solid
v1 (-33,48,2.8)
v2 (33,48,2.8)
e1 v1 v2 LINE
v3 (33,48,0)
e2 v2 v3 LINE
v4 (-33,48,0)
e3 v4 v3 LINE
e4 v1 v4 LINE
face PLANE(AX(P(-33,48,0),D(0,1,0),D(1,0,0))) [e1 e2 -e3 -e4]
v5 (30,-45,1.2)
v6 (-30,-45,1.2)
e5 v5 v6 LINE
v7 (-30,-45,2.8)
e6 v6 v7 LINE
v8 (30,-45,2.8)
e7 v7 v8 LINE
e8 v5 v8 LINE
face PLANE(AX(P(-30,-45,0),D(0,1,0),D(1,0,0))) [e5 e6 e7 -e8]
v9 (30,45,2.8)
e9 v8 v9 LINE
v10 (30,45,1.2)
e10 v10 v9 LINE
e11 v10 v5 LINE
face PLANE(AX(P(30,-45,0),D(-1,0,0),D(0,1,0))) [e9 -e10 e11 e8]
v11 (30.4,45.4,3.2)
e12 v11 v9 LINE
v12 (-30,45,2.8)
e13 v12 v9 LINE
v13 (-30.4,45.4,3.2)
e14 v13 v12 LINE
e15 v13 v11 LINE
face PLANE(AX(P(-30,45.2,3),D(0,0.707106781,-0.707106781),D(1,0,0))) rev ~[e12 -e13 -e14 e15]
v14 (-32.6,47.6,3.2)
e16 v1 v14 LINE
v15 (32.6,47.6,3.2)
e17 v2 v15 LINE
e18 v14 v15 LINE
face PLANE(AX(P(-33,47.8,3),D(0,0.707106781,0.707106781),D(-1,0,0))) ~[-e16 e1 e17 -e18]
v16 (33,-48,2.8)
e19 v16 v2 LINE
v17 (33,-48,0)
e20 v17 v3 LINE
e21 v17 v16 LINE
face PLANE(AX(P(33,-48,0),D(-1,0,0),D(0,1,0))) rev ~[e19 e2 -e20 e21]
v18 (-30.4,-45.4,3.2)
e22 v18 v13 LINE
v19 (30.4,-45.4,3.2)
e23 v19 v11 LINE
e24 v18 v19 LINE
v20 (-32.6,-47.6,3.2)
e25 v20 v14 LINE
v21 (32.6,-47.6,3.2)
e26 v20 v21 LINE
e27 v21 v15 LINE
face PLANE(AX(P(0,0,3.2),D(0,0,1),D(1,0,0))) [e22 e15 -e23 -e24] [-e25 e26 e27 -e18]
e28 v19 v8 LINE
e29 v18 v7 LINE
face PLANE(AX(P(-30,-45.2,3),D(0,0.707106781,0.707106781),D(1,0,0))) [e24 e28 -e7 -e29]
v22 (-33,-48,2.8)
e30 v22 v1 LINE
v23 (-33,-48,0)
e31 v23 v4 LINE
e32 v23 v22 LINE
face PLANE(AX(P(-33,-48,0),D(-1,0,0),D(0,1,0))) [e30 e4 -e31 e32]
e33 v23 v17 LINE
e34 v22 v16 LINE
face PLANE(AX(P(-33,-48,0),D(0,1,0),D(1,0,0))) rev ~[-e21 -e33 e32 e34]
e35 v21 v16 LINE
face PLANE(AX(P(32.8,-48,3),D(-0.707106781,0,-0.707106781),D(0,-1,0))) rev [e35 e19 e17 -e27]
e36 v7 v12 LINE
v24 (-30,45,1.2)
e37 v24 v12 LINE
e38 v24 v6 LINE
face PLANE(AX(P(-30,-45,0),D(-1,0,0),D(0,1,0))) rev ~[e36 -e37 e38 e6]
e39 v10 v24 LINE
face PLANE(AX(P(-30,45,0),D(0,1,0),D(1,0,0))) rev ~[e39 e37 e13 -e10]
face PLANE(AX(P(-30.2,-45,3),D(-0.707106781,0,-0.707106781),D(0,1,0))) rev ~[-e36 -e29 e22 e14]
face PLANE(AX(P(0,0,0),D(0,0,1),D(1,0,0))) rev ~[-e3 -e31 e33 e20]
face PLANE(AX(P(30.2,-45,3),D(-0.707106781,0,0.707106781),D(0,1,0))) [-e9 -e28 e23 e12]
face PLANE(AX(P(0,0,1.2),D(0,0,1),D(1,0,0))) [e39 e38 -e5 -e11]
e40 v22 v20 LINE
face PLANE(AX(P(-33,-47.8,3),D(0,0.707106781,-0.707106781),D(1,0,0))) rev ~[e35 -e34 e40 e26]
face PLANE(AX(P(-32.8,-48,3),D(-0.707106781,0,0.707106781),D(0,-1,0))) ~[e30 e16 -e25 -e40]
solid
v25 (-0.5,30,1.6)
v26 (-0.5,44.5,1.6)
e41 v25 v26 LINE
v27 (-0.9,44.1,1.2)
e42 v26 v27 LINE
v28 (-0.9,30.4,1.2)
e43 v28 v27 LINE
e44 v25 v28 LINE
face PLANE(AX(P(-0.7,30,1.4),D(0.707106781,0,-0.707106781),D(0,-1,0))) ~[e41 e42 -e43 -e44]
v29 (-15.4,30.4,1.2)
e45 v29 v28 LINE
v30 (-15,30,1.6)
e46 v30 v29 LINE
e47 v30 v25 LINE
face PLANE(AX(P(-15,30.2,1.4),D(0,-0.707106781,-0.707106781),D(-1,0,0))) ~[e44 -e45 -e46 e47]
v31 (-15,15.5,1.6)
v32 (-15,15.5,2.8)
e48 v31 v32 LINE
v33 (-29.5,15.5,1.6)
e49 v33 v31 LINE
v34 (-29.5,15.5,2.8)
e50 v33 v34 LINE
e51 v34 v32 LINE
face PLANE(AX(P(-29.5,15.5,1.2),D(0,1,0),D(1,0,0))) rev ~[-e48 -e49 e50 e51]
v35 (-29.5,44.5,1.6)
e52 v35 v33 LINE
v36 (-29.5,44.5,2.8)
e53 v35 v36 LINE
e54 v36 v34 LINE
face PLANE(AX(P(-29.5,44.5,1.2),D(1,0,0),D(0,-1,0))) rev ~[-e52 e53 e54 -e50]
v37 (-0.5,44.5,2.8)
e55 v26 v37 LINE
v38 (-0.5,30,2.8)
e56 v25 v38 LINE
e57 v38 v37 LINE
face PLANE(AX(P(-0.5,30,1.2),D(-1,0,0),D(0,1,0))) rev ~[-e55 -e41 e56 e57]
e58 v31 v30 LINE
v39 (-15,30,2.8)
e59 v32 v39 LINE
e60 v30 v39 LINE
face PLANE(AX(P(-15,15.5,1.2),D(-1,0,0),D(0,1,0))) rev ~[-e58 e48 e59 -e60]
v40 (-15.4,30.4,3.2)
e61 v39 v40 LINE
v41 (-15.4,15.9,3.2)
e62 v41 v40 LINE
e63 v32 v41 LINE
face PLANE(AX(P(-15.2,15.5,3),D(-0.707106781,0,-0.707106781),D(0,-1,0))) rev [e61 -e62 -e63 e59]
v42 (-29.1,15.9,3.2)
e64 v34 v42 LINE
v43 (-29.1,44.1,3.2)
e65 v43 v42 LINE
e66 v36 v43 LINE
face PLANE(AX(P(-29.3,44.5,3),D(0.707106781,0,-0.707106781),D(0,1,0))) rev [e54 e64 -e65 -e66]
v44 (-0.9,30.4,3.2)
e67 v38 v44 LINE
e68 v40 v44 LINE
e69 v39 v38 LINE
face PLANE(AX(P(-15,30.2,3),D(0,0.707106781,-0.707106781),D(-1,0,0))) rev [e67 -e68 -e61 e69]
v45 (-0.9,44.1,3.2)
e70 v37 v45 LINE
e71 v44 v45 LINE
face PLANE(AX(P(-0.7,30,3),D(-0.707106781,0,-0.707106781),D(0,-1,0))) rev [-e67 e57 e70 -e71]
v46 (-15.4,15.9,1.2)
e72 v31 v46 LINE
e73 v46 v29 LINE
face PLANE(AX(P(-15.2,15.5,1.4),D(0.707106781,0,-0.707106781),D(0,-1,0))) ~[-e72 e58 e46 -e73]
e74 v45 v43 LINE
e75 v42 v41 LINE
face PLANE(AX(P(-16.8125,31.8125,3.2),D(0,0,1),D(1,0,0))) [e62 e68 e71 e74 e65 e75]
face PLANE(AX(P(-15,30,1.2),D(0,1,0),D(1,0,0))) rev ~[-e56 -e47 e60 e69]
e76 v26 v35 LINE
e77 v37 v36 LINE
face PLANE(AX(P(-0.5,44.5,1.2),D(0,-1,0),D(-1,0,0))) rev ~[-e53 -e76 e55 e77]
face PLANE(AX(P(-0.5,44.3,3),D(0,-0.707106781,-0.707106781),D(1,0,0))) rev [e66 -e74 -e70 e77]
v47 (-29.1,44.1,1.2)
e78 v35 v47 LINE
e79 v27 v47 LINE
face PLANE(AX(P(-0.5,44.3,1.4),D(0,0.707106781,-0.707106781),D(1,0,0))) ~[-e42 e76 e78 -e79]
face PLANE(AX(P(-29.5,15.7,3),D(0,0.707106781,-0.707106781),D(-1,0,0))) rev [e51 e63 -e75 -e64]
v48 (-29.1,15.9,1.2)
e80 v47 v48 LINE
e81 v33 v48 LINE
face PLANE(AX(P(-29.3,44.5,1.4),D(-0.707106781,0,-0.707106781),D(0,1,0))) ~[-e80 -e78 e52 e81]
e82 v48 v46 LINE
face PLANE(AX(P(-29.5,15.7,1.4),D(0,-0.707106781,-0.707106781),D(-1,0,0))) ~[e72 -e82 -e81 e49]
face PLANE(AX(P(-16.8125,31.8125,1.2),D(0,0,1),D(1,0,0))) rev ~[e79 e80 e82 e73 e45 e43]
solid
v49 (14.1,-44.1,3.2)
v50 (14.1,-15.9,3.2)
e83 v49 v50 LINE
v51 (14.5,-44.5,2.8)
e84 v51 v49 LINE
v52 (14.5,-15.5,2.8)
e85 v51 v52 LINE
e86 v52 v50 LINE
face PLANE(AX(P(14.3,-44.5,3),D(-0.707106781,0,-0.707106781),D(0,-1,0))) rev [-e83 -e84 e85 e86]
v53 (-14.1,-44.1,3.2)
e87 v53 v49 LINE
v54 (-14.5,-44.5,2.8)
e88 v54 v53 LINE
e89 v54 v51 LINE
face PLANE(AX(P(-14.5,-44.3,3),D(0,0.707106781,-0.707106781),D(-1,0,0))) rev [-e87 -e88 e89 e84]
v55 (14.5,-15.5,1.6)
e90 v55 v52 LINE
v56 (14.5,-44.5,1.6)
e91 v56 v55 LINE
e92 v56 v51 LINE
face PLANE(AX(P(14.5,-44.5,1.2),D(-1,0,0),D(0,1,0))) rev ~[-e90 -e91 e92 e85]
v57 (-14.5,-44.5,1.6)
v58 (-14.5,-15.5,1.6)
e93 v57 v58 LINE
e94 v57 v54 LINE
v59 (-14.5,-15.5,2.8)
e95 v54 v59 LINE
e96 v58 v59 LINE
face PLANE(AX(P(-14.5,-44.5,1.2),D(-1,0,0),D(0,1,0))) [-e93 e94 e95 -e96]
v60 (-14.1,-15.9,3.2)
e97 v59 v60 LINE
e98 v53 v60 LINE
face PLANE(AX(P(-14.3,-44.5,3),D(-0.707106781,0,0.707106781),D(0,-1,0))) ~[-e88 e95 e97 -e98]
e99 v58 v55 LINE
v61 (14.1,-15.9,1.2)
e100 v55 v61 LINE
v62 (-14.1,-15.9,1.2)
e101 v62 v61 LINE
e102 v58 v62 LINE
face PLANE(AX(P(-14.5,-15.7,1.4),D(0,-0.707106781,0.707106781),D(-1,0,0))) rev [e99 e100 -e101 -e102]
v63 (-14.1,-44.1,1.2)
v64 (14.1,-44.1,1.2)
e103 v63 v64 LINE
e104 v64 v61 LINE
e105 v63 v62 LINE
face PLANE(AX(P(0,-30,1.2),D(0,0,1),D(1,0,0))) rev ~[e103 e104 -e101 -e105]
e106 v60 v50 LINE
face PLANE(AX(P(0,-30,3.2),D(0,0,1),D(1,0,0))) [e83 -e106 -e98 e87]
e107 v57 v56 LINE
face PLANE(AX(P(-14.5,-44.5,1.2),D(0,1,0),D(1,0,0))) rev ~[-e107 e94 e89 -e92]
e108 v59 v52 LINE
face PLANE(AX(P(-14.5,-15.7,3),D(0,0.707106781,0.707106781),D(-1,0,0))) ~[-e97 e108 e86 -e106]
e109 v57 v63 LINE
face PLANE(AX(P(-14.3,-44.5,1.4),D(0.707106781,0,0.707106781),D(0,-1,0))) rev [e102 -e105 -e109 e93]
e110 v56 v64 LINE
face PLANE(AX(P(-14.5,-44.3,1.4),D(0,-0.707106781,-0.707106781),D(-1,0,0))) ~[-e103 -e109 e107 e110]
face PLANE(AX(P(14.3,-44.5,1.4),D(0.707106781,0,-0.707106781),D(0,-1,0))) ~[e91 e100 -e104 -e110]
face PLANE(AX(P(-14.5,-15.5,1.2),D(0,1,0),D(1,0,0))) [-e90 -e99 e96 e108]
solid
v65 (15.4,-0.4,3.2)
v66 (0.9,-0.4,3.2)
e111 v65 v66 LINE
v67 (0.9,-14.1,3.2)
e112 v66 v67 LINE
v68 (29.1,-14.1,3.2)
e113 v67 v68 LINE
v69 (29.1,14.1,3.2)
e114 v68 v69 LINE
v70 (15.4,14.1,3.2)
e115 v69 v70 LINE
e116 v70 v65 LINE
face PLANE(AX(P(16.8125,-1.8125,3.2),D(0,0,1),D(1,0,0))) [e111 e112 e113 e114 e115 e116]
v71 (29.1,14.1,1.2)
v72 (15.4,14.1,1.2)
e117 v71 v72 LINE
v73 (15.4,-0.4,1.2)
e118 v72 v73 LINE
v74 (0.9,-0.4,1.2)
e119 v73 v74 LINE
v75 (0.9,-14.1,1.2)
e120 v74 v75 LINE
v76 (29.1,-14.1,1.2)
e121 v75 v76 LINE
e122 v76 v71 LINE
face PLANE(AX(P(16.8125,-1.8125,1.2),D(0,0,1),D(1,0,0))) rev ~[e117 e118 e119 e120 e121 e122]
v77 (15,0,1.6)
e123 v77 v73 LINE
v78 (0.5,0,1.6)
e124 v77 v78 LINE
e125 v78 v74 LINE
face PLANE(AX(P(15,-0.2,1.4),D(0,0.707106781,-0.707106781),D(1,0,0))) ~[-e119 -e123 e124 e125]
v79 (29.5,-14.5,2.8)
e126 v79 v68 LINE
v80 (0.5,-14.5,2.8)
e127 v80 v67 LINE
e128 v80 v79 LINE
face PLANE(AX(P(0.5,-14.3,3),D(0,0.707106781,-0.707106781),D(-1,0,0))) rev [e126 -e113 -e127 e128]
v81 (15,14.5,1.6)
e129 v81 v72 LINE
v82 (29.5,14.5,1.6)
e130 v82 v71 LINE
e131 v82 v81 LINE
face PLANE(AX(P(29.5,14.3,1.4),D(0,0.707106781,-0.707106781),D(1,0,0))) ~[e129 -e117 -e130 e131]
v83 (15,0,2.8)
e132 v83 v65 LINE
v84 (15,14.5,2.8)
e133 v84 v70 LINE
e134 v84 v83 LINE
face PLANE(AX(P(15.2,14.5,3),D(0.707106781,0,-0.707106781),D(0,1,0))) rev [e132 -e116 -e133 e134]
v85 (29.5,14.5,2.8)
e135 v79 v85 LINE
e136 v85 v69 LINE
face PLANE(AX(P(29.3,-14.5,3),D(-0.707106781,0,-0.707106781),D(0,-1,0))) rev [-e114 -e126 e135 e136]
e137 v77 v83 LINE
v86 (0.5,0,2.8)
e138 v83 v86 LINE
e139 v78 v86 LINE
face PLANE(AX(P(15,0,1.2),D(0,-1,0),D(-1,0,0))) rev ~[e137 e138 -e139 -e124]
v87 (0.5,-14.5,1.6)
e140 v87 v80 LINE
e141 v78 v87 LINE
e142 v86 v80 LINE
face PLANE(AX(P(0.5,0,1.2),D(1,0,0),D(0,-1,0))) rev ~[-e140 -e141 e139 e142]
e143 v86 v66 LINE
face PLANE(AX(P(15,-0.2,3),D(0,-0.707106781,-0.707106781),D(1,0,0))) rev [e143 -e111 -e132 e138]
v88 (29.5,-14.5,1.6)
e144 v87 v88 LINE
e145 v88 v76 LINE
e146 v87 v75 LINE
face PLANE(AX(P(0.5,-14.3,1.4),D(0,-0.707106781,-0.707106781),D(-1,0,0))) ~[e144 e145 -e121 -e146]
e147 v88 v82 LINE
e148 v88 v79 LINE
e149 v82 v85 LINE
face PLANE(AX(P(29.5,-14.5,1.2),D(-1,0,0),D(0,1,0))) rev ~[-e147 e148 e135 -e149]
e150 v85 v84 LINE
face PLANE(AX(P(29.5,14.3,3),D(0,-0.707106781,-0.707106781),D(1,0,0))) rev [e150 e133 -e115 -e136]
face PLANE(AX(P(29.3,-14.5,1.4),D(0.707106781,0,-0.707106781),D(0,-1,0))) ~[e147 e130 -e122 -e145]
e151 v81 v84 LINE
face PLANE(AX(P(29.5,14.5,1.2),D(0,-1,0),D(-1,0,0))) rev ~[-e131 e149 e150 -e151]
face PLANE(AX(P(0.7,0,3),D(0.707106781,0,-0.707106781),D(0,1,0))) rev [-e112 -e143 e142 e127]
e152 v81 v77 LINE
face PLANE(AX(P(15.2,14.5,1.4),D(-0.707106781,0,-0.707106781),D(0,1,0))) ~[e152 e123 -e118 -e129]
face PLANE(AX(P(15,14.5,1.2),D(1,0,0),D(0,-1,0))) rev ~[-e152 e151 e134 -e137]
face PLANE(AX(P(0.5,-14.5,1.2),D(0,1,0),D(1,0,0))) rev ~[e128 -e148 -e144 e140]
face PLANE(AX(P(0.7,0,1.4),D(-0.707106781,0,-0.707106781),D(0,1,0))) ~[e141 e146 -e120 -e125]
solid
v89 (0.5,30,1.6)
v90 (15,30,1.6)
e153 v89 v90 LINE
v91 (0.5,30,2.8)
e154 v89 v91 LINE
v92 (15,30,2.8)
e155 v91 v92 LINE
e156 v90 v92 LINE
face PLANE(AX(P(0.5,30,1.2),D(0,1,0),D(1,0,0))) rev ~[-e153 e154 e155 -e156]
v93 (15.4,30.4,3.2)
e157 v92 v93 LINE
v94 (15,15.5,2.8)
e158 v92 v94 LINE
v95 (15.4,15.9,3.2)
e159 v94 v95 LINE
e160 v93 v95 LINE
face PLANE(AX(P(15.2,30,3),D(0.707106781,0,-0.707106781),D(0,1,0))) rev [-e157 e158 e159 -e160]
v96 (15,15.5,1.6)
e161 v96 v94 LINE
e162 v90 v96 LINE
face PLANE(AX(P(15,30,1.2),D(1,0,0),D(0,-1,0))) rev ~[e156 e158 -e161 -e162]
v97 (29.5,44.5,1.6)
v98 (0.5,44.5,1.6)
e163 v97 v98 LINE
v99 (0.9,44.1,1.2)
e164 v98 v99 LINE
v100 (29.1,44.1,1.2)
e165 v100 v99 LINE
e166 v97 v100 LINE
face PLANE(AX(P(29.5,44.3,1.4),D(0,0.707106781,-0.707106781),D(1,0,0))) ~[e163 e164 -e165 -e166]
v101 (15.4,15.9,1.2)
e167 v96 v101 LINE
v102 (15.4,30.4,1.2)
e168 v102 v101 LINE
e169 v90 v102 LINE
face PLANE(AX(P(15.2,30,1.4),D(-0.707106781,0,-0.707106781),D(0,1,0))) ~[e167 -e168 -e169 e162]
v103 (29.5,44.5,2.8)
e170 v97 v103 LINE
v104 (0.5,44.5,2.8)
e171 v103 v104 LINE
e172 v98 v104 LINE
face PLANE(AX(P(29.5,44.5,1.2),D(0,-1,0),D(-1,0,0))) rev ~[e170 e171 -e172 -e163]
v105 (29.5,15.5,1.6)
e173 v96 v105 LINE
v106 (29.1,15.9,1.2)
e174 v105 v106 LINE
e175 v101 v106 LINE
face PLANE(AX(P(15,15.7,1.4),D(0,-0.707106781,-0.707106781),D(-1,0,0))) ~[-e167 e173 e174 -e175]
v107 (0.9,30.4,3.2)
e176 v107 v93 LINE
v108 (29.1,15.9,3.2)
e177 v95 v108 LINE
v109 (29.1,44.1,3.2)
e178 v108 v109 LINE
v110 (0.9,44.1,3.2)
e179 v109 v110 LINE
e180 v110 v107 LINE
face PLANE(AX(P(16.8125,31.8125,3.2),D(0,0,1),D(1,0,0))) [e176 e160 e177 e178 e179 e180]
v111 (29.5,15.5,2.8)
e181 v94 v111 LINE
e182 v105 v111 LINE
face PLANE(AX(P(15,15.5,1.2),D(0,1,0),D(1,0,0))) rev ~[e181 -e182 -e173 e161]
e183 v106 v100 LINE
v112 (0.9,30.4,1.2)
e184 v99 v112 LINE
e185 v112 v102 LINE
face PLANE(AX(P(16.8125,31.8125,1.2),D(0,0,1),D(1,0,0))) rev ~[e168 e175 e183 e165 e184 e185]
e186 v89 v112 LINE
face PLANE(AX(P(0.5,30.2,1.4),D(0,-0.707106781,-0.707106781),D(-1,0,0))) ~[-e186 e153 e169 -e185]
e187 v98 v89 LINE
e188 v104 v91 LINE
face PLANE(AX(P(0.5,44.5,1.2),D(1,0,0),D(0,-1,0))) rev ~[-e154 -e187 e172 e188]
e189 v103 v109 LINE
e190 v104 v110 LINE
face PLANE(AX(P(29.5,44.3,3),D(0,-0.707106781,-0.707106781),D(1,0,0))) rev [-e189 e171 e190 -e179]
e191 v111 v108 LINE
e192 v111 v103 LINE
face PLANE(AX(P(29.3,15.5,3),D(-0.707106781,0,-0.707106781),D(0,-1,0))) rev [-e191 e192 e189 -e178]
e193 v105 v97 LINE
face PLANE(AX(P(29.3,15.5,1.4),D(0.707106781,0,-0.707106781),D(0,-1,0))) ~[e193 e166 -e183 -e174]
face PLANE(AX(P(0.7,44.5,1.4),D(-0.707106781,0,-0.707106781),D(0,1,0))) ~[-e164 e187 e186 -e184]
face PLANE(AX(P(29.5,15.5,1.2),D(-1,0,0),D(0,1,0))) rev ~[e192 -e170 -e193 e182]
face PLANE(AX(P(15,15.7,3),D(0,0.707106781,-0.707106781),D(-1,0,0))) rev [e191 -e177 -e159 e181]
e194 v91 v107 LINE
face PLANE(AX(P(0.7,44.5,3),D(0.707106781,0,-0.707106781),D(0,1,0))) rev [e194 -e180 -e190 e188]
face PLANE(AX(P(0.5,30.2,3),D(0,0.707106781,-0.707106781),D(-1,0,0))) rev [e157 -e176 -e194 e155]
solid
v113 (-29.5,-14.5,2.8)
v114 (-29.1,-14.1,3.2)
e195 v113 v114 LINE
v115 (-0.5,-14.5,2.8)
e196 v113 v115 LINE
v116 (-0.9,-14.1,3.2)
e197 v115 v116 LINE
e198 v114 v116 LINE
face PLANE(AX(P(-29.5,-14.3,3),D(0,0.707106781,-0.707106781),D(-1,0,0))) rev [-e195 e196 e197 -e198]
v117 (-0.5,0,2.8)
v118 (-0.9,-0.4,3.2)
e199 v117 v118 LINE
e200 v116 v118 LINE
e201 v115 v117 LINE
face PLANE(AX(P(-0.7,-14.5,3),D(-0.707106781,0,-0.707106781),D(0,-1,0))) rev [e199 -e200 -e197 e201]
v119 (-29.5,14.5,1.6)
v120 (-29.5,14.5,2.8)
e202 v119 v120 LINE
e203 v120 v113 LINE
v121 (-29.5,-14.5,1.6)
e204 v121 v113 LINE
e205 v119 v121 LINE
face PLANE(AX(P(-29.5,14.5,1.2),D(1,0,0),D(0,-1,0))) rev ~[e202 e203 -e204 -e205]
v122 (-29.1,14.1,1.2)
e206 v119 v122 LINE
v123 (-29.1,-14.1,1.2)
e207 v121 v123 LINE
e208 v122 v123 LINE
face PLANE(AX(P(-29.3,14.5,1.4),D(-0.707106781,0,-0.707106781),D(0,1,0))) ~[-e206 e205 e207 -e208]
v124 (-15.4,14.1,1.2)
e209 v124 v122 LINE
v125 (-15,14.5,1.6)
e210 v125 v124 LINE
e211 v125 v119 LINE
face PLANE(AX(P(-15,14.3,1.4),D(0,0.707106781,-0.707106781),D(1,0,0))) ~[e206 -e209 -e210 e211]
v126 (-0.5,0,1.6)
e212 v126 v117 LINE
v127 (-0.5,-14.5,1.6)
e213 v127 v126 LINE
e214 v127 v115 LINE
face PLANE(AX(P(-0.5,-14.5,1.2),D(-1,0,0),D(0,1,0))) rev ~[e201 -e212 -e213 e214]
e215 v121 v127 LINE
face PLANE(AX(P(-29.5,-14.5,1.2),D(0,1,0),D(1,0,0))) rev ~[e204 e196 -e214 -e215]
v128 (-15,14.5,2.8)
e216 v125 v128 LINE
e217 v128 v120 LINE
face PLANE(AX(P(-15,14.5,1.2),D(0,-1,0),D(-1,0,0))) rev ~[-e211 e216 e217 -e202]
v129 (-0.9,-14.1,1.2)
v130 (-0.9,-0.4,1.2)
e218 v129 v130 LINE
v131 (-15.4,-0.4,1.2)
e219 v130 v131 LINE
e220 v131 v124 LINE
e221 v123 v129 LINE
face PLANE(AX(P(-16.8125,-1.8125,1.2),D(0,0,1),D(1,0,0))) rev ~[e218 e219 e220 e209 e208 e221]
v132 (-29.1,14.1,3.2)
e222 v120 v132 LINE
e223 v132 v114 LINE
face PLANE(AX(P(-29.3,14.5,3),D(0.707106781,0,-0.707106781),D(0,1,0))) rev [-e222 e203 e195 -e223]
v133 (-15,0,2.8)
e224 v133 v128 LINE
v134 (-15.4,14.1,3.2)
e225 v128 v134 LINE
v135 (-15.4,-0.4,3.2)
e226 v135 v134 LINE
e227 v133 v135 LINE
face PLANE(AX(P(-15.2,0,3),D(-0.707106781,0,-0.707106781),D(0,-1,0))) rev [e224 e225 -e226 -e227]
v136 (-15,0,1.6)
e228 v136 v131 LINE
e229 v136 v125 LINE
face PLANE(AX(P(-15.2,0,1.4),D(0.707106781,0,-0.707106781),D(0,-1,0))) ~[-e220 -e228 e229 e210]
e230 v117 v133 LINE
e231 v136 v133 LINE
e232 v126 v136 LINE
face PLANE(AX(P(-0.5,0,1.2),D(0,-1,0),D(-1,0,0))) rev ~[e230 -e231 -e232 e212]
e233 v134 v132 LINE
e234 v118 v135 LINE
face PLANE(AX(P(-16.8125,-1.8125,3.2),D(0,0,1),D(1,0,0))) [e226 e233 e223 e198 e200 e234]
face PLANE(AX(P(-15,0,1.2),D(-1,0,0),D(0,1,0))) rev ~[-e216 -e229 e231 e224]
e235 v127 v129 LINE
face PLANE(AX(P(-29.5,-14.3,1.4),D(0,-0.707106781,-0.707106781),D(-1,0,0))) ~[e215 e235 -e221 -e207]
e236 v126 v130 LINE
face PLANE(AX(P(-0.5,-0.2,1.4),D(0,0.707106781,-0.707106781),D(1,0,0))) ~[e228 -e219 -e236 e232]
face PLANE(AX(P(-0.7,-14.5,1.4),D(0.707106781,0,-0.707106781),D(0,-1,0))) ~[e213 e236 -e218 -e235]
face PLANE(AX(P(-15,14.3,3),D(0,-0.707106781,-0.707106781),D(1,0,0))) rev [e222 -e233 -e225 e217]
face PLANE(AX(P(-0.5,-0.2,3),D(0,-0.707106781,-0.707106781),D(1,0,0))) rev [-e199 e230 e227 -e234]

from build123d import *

# Parameters (mm, degrees)
F0_W      = 66
F0_H      = 96
F0_W_2    = 60
F0_H_2    = 90
F1_DEPTH  = 1.2
F2_DEPTH  = 3.2
F4_DEPTH  = 2
F3_W      = 29
F3_H      = 29
F5_SIZE   = 0.4
F5_2_SIZE = 0.4
F5_3_SIZE = 0.4
F5_4_SIZE = 0.4
F5_5_SIZE = 0.4
F5_6_SIZE = 0.4


with BuildPart() as f1:
    # F0 (on Top) → F1 (new body)
    with BuildSketch(Plane.XY):
        Rectangle(F0_W, F0_H)
        Rectangle(F0_W_2, F0_H_2, mode=Mode.SUBTRACT)
        Rectangle(F0_W_2, F0_H_2)
    extrude(amount=F1_DEPTH)

    # F0 (on Top) → F2 (join)
    with BuildSketch(Plane.XY):
        Rectangle(F0_W, F0_H)
        Rectangle(F0_W_2, F0_H_2, mode=Mode.SUBTRACT)
    extrude(amount=F2_DEPTH)

    # F5#6
    f5_6_edges = [f1.edges().sort_by_distance(p)[0] for p in [
        (0, 48, 3.2),
        (-33, 0, 3.2),
        (0, -48, 3.2),
        (33, 0, 3.2),
        (-30, 0, 3.2),
        (0, 45, 3.2),
        (30, 0, 3.2),
        (0, -45, 3.2),
    ]]
    chamfer(f5_6_edges, length=F5_6_SIZE)


with BuildPart() as f4:
    # F3 (on face) → F4 (new body)
    with BuildSketch(Plane.XY.offset(1.2)):
        Polygon((-0.5, 44.5), (-29.5, 44.5), (-29.5, 15.5), (-15, 15.5), (-15, 30), (-0.5, 30), align=None)
    extrude(amount=F4_DEPTH)

    # F5
    f5_edges = [f4.edges().sort_by_distance(p)[0] for p in [
        (-15, 44.5, 3.2),
        (-29.5, 30, 3.2),
        (-22.25, 15.5, 3.2),
        (-15, 22.75, 3.2),
        (-7.75, 30, 3.2),
        (-0.5, 37.25, 3.2),
        (-15, 44.5, 1.2),
        (-29.5, 30, 1.2),
        (-22.25, 15.5, 1.2),
        (-15, 22.75, 1.2),
        (-7.75, 30, 1.2),
        (-0.5, 37.25, 1.2),
    ]]
    chamfer(f5_edges, length=F5_SIZE)


with BuildPart() as f4b:
    # F3 (on face) → F4, piece 2 (new body)
    with BuildSketch(Plane.XY.offset(1.2)):
        Polygon((29.5, 15.5), (29.5, 44.5), (0.5, 44.5), (0.5, 30), (15, 30), (15, 15.5), align=None)
    extrude(amount=F4_DEPTH)

    # F5#2
    f5_2_edges = [f4b.edges().sort_by_distance(p)[0] for p in [
        (29.5, 30, 3.2),
        (15, 44.5, 3.2),
        (0.5, 37.25, 3.2),
        (7.75, 30, 3.2),
        (15, 22.75, 3.2),
        (22.25, 15.5, 3.2),
        (29.5, 30, 1.2),
        (15, 44.5, 1.2),
        (0.5, 37.25, 1.2),
        (7.75, 30, 1.2),
        (15, 22.75, 1.2),
        (22.25, 15.5, 1.2),
    ]]
    chamfer(f5_2_edges, length=F5_2_SIZE)


with BuildPart() as f4c:
    # F3 (on face) → F4, piece 3 (new body)
    with BuildSketch(Plane.XY.offset(1.2)):
        Polygon((-29.5, 14.5), (-29.5, -14.5), (-0.5, -14.5), (-0.5, 0), (-15, 0), (-15, 14.5), align=None)
    extrude(amount=F4_DEPTH)

    # F5#4
    f5_4_edges = [f4c.edges().sort_by_distance(p)[0] for p in [
        (-29.5, 0, 3.2),
        (-15, -14.5, 3.2),
        (-0.5, -7.25, 3.2),
        (-7.75, 0, 3.2),
        (-15, 7.25, 3.2),
        (-22.25, 14.5, 3.2),
        (-29.5, 0, 1.2),
        (-15, -14.5, 1.2),
        (-0.5, -7.25, 1.2),
        (-7.75, 0, 1.2),
        (-15, 7.25, 1.2),
        (-22.25, 14.5, 1.2),
    ]]
    chamfer(f5_4_edges, length=F5_4_SIZE)


with BuildPart() as f4d:
    # F3 (on face) → F4, piece 4 (new body)
    with BuildSketch(Plane.XY.offset(1.2)):
        Polygon((0.5, -14.5), (29.5, -14.5), (29.5, 14.5), (15, 14.5), (15, 0), (0.5, 0), align=None)
    extrude(amount=F4_DEPTH)

    # F5#3
    f5_3_edges = [f4d.edges().sort_by_distance(p)[0] for p in [
        (15, -14.5, 3.2),
        (29.5, 0, 3.2),
        (22.25, 14.5, 3.2),
        (15, 7.25, 3.2),
        (7.75, 0, 3.2),
        (0.5, -7.25, 3.2),
        (15, -14.5, 1.2),
        (29.5, 0, 1.2),
        (22.25, 14.5, 1.2),
        (15, 7.25, 1.2),
        (7.75, 0, 1.2),
        (0.5, -7.25, 1.2),
    ]]
    chamfer(f5_3_edges, length=F5_3_SIZE)


with BuildPart() as f4e:
    # F3 (on face) → F4, piece 5 (new body)
    with BuildSketch(Plane.XY.offset(1.2)):
        with Locations((0, -30)):
            Rectangle(F3_W, F3_H)
    extrude(amount=F4_DEPTH)

    # F5#5
    f5_5_edges = [f4e.edges().sort_by_distance(p)[0] for p in [
        (-14.5, -30, 3.2),
        (0, -44.5, 3.2),
        (14.5, -30, 3.2),
        (0, -15.5, 3.2),
        (-14.5, -30, 1.2),
        (0, -44.5, 1.2),
        (14.5, -30, 1.2),
        (0, -15.5, 1.2),
    ]]
    chamfer(f5_5_edges, length=F5_5_SIZE)


solid = Compound([f1.part, f4.part, f4b.part, f4c.part, f4d.part, f4e.part])
